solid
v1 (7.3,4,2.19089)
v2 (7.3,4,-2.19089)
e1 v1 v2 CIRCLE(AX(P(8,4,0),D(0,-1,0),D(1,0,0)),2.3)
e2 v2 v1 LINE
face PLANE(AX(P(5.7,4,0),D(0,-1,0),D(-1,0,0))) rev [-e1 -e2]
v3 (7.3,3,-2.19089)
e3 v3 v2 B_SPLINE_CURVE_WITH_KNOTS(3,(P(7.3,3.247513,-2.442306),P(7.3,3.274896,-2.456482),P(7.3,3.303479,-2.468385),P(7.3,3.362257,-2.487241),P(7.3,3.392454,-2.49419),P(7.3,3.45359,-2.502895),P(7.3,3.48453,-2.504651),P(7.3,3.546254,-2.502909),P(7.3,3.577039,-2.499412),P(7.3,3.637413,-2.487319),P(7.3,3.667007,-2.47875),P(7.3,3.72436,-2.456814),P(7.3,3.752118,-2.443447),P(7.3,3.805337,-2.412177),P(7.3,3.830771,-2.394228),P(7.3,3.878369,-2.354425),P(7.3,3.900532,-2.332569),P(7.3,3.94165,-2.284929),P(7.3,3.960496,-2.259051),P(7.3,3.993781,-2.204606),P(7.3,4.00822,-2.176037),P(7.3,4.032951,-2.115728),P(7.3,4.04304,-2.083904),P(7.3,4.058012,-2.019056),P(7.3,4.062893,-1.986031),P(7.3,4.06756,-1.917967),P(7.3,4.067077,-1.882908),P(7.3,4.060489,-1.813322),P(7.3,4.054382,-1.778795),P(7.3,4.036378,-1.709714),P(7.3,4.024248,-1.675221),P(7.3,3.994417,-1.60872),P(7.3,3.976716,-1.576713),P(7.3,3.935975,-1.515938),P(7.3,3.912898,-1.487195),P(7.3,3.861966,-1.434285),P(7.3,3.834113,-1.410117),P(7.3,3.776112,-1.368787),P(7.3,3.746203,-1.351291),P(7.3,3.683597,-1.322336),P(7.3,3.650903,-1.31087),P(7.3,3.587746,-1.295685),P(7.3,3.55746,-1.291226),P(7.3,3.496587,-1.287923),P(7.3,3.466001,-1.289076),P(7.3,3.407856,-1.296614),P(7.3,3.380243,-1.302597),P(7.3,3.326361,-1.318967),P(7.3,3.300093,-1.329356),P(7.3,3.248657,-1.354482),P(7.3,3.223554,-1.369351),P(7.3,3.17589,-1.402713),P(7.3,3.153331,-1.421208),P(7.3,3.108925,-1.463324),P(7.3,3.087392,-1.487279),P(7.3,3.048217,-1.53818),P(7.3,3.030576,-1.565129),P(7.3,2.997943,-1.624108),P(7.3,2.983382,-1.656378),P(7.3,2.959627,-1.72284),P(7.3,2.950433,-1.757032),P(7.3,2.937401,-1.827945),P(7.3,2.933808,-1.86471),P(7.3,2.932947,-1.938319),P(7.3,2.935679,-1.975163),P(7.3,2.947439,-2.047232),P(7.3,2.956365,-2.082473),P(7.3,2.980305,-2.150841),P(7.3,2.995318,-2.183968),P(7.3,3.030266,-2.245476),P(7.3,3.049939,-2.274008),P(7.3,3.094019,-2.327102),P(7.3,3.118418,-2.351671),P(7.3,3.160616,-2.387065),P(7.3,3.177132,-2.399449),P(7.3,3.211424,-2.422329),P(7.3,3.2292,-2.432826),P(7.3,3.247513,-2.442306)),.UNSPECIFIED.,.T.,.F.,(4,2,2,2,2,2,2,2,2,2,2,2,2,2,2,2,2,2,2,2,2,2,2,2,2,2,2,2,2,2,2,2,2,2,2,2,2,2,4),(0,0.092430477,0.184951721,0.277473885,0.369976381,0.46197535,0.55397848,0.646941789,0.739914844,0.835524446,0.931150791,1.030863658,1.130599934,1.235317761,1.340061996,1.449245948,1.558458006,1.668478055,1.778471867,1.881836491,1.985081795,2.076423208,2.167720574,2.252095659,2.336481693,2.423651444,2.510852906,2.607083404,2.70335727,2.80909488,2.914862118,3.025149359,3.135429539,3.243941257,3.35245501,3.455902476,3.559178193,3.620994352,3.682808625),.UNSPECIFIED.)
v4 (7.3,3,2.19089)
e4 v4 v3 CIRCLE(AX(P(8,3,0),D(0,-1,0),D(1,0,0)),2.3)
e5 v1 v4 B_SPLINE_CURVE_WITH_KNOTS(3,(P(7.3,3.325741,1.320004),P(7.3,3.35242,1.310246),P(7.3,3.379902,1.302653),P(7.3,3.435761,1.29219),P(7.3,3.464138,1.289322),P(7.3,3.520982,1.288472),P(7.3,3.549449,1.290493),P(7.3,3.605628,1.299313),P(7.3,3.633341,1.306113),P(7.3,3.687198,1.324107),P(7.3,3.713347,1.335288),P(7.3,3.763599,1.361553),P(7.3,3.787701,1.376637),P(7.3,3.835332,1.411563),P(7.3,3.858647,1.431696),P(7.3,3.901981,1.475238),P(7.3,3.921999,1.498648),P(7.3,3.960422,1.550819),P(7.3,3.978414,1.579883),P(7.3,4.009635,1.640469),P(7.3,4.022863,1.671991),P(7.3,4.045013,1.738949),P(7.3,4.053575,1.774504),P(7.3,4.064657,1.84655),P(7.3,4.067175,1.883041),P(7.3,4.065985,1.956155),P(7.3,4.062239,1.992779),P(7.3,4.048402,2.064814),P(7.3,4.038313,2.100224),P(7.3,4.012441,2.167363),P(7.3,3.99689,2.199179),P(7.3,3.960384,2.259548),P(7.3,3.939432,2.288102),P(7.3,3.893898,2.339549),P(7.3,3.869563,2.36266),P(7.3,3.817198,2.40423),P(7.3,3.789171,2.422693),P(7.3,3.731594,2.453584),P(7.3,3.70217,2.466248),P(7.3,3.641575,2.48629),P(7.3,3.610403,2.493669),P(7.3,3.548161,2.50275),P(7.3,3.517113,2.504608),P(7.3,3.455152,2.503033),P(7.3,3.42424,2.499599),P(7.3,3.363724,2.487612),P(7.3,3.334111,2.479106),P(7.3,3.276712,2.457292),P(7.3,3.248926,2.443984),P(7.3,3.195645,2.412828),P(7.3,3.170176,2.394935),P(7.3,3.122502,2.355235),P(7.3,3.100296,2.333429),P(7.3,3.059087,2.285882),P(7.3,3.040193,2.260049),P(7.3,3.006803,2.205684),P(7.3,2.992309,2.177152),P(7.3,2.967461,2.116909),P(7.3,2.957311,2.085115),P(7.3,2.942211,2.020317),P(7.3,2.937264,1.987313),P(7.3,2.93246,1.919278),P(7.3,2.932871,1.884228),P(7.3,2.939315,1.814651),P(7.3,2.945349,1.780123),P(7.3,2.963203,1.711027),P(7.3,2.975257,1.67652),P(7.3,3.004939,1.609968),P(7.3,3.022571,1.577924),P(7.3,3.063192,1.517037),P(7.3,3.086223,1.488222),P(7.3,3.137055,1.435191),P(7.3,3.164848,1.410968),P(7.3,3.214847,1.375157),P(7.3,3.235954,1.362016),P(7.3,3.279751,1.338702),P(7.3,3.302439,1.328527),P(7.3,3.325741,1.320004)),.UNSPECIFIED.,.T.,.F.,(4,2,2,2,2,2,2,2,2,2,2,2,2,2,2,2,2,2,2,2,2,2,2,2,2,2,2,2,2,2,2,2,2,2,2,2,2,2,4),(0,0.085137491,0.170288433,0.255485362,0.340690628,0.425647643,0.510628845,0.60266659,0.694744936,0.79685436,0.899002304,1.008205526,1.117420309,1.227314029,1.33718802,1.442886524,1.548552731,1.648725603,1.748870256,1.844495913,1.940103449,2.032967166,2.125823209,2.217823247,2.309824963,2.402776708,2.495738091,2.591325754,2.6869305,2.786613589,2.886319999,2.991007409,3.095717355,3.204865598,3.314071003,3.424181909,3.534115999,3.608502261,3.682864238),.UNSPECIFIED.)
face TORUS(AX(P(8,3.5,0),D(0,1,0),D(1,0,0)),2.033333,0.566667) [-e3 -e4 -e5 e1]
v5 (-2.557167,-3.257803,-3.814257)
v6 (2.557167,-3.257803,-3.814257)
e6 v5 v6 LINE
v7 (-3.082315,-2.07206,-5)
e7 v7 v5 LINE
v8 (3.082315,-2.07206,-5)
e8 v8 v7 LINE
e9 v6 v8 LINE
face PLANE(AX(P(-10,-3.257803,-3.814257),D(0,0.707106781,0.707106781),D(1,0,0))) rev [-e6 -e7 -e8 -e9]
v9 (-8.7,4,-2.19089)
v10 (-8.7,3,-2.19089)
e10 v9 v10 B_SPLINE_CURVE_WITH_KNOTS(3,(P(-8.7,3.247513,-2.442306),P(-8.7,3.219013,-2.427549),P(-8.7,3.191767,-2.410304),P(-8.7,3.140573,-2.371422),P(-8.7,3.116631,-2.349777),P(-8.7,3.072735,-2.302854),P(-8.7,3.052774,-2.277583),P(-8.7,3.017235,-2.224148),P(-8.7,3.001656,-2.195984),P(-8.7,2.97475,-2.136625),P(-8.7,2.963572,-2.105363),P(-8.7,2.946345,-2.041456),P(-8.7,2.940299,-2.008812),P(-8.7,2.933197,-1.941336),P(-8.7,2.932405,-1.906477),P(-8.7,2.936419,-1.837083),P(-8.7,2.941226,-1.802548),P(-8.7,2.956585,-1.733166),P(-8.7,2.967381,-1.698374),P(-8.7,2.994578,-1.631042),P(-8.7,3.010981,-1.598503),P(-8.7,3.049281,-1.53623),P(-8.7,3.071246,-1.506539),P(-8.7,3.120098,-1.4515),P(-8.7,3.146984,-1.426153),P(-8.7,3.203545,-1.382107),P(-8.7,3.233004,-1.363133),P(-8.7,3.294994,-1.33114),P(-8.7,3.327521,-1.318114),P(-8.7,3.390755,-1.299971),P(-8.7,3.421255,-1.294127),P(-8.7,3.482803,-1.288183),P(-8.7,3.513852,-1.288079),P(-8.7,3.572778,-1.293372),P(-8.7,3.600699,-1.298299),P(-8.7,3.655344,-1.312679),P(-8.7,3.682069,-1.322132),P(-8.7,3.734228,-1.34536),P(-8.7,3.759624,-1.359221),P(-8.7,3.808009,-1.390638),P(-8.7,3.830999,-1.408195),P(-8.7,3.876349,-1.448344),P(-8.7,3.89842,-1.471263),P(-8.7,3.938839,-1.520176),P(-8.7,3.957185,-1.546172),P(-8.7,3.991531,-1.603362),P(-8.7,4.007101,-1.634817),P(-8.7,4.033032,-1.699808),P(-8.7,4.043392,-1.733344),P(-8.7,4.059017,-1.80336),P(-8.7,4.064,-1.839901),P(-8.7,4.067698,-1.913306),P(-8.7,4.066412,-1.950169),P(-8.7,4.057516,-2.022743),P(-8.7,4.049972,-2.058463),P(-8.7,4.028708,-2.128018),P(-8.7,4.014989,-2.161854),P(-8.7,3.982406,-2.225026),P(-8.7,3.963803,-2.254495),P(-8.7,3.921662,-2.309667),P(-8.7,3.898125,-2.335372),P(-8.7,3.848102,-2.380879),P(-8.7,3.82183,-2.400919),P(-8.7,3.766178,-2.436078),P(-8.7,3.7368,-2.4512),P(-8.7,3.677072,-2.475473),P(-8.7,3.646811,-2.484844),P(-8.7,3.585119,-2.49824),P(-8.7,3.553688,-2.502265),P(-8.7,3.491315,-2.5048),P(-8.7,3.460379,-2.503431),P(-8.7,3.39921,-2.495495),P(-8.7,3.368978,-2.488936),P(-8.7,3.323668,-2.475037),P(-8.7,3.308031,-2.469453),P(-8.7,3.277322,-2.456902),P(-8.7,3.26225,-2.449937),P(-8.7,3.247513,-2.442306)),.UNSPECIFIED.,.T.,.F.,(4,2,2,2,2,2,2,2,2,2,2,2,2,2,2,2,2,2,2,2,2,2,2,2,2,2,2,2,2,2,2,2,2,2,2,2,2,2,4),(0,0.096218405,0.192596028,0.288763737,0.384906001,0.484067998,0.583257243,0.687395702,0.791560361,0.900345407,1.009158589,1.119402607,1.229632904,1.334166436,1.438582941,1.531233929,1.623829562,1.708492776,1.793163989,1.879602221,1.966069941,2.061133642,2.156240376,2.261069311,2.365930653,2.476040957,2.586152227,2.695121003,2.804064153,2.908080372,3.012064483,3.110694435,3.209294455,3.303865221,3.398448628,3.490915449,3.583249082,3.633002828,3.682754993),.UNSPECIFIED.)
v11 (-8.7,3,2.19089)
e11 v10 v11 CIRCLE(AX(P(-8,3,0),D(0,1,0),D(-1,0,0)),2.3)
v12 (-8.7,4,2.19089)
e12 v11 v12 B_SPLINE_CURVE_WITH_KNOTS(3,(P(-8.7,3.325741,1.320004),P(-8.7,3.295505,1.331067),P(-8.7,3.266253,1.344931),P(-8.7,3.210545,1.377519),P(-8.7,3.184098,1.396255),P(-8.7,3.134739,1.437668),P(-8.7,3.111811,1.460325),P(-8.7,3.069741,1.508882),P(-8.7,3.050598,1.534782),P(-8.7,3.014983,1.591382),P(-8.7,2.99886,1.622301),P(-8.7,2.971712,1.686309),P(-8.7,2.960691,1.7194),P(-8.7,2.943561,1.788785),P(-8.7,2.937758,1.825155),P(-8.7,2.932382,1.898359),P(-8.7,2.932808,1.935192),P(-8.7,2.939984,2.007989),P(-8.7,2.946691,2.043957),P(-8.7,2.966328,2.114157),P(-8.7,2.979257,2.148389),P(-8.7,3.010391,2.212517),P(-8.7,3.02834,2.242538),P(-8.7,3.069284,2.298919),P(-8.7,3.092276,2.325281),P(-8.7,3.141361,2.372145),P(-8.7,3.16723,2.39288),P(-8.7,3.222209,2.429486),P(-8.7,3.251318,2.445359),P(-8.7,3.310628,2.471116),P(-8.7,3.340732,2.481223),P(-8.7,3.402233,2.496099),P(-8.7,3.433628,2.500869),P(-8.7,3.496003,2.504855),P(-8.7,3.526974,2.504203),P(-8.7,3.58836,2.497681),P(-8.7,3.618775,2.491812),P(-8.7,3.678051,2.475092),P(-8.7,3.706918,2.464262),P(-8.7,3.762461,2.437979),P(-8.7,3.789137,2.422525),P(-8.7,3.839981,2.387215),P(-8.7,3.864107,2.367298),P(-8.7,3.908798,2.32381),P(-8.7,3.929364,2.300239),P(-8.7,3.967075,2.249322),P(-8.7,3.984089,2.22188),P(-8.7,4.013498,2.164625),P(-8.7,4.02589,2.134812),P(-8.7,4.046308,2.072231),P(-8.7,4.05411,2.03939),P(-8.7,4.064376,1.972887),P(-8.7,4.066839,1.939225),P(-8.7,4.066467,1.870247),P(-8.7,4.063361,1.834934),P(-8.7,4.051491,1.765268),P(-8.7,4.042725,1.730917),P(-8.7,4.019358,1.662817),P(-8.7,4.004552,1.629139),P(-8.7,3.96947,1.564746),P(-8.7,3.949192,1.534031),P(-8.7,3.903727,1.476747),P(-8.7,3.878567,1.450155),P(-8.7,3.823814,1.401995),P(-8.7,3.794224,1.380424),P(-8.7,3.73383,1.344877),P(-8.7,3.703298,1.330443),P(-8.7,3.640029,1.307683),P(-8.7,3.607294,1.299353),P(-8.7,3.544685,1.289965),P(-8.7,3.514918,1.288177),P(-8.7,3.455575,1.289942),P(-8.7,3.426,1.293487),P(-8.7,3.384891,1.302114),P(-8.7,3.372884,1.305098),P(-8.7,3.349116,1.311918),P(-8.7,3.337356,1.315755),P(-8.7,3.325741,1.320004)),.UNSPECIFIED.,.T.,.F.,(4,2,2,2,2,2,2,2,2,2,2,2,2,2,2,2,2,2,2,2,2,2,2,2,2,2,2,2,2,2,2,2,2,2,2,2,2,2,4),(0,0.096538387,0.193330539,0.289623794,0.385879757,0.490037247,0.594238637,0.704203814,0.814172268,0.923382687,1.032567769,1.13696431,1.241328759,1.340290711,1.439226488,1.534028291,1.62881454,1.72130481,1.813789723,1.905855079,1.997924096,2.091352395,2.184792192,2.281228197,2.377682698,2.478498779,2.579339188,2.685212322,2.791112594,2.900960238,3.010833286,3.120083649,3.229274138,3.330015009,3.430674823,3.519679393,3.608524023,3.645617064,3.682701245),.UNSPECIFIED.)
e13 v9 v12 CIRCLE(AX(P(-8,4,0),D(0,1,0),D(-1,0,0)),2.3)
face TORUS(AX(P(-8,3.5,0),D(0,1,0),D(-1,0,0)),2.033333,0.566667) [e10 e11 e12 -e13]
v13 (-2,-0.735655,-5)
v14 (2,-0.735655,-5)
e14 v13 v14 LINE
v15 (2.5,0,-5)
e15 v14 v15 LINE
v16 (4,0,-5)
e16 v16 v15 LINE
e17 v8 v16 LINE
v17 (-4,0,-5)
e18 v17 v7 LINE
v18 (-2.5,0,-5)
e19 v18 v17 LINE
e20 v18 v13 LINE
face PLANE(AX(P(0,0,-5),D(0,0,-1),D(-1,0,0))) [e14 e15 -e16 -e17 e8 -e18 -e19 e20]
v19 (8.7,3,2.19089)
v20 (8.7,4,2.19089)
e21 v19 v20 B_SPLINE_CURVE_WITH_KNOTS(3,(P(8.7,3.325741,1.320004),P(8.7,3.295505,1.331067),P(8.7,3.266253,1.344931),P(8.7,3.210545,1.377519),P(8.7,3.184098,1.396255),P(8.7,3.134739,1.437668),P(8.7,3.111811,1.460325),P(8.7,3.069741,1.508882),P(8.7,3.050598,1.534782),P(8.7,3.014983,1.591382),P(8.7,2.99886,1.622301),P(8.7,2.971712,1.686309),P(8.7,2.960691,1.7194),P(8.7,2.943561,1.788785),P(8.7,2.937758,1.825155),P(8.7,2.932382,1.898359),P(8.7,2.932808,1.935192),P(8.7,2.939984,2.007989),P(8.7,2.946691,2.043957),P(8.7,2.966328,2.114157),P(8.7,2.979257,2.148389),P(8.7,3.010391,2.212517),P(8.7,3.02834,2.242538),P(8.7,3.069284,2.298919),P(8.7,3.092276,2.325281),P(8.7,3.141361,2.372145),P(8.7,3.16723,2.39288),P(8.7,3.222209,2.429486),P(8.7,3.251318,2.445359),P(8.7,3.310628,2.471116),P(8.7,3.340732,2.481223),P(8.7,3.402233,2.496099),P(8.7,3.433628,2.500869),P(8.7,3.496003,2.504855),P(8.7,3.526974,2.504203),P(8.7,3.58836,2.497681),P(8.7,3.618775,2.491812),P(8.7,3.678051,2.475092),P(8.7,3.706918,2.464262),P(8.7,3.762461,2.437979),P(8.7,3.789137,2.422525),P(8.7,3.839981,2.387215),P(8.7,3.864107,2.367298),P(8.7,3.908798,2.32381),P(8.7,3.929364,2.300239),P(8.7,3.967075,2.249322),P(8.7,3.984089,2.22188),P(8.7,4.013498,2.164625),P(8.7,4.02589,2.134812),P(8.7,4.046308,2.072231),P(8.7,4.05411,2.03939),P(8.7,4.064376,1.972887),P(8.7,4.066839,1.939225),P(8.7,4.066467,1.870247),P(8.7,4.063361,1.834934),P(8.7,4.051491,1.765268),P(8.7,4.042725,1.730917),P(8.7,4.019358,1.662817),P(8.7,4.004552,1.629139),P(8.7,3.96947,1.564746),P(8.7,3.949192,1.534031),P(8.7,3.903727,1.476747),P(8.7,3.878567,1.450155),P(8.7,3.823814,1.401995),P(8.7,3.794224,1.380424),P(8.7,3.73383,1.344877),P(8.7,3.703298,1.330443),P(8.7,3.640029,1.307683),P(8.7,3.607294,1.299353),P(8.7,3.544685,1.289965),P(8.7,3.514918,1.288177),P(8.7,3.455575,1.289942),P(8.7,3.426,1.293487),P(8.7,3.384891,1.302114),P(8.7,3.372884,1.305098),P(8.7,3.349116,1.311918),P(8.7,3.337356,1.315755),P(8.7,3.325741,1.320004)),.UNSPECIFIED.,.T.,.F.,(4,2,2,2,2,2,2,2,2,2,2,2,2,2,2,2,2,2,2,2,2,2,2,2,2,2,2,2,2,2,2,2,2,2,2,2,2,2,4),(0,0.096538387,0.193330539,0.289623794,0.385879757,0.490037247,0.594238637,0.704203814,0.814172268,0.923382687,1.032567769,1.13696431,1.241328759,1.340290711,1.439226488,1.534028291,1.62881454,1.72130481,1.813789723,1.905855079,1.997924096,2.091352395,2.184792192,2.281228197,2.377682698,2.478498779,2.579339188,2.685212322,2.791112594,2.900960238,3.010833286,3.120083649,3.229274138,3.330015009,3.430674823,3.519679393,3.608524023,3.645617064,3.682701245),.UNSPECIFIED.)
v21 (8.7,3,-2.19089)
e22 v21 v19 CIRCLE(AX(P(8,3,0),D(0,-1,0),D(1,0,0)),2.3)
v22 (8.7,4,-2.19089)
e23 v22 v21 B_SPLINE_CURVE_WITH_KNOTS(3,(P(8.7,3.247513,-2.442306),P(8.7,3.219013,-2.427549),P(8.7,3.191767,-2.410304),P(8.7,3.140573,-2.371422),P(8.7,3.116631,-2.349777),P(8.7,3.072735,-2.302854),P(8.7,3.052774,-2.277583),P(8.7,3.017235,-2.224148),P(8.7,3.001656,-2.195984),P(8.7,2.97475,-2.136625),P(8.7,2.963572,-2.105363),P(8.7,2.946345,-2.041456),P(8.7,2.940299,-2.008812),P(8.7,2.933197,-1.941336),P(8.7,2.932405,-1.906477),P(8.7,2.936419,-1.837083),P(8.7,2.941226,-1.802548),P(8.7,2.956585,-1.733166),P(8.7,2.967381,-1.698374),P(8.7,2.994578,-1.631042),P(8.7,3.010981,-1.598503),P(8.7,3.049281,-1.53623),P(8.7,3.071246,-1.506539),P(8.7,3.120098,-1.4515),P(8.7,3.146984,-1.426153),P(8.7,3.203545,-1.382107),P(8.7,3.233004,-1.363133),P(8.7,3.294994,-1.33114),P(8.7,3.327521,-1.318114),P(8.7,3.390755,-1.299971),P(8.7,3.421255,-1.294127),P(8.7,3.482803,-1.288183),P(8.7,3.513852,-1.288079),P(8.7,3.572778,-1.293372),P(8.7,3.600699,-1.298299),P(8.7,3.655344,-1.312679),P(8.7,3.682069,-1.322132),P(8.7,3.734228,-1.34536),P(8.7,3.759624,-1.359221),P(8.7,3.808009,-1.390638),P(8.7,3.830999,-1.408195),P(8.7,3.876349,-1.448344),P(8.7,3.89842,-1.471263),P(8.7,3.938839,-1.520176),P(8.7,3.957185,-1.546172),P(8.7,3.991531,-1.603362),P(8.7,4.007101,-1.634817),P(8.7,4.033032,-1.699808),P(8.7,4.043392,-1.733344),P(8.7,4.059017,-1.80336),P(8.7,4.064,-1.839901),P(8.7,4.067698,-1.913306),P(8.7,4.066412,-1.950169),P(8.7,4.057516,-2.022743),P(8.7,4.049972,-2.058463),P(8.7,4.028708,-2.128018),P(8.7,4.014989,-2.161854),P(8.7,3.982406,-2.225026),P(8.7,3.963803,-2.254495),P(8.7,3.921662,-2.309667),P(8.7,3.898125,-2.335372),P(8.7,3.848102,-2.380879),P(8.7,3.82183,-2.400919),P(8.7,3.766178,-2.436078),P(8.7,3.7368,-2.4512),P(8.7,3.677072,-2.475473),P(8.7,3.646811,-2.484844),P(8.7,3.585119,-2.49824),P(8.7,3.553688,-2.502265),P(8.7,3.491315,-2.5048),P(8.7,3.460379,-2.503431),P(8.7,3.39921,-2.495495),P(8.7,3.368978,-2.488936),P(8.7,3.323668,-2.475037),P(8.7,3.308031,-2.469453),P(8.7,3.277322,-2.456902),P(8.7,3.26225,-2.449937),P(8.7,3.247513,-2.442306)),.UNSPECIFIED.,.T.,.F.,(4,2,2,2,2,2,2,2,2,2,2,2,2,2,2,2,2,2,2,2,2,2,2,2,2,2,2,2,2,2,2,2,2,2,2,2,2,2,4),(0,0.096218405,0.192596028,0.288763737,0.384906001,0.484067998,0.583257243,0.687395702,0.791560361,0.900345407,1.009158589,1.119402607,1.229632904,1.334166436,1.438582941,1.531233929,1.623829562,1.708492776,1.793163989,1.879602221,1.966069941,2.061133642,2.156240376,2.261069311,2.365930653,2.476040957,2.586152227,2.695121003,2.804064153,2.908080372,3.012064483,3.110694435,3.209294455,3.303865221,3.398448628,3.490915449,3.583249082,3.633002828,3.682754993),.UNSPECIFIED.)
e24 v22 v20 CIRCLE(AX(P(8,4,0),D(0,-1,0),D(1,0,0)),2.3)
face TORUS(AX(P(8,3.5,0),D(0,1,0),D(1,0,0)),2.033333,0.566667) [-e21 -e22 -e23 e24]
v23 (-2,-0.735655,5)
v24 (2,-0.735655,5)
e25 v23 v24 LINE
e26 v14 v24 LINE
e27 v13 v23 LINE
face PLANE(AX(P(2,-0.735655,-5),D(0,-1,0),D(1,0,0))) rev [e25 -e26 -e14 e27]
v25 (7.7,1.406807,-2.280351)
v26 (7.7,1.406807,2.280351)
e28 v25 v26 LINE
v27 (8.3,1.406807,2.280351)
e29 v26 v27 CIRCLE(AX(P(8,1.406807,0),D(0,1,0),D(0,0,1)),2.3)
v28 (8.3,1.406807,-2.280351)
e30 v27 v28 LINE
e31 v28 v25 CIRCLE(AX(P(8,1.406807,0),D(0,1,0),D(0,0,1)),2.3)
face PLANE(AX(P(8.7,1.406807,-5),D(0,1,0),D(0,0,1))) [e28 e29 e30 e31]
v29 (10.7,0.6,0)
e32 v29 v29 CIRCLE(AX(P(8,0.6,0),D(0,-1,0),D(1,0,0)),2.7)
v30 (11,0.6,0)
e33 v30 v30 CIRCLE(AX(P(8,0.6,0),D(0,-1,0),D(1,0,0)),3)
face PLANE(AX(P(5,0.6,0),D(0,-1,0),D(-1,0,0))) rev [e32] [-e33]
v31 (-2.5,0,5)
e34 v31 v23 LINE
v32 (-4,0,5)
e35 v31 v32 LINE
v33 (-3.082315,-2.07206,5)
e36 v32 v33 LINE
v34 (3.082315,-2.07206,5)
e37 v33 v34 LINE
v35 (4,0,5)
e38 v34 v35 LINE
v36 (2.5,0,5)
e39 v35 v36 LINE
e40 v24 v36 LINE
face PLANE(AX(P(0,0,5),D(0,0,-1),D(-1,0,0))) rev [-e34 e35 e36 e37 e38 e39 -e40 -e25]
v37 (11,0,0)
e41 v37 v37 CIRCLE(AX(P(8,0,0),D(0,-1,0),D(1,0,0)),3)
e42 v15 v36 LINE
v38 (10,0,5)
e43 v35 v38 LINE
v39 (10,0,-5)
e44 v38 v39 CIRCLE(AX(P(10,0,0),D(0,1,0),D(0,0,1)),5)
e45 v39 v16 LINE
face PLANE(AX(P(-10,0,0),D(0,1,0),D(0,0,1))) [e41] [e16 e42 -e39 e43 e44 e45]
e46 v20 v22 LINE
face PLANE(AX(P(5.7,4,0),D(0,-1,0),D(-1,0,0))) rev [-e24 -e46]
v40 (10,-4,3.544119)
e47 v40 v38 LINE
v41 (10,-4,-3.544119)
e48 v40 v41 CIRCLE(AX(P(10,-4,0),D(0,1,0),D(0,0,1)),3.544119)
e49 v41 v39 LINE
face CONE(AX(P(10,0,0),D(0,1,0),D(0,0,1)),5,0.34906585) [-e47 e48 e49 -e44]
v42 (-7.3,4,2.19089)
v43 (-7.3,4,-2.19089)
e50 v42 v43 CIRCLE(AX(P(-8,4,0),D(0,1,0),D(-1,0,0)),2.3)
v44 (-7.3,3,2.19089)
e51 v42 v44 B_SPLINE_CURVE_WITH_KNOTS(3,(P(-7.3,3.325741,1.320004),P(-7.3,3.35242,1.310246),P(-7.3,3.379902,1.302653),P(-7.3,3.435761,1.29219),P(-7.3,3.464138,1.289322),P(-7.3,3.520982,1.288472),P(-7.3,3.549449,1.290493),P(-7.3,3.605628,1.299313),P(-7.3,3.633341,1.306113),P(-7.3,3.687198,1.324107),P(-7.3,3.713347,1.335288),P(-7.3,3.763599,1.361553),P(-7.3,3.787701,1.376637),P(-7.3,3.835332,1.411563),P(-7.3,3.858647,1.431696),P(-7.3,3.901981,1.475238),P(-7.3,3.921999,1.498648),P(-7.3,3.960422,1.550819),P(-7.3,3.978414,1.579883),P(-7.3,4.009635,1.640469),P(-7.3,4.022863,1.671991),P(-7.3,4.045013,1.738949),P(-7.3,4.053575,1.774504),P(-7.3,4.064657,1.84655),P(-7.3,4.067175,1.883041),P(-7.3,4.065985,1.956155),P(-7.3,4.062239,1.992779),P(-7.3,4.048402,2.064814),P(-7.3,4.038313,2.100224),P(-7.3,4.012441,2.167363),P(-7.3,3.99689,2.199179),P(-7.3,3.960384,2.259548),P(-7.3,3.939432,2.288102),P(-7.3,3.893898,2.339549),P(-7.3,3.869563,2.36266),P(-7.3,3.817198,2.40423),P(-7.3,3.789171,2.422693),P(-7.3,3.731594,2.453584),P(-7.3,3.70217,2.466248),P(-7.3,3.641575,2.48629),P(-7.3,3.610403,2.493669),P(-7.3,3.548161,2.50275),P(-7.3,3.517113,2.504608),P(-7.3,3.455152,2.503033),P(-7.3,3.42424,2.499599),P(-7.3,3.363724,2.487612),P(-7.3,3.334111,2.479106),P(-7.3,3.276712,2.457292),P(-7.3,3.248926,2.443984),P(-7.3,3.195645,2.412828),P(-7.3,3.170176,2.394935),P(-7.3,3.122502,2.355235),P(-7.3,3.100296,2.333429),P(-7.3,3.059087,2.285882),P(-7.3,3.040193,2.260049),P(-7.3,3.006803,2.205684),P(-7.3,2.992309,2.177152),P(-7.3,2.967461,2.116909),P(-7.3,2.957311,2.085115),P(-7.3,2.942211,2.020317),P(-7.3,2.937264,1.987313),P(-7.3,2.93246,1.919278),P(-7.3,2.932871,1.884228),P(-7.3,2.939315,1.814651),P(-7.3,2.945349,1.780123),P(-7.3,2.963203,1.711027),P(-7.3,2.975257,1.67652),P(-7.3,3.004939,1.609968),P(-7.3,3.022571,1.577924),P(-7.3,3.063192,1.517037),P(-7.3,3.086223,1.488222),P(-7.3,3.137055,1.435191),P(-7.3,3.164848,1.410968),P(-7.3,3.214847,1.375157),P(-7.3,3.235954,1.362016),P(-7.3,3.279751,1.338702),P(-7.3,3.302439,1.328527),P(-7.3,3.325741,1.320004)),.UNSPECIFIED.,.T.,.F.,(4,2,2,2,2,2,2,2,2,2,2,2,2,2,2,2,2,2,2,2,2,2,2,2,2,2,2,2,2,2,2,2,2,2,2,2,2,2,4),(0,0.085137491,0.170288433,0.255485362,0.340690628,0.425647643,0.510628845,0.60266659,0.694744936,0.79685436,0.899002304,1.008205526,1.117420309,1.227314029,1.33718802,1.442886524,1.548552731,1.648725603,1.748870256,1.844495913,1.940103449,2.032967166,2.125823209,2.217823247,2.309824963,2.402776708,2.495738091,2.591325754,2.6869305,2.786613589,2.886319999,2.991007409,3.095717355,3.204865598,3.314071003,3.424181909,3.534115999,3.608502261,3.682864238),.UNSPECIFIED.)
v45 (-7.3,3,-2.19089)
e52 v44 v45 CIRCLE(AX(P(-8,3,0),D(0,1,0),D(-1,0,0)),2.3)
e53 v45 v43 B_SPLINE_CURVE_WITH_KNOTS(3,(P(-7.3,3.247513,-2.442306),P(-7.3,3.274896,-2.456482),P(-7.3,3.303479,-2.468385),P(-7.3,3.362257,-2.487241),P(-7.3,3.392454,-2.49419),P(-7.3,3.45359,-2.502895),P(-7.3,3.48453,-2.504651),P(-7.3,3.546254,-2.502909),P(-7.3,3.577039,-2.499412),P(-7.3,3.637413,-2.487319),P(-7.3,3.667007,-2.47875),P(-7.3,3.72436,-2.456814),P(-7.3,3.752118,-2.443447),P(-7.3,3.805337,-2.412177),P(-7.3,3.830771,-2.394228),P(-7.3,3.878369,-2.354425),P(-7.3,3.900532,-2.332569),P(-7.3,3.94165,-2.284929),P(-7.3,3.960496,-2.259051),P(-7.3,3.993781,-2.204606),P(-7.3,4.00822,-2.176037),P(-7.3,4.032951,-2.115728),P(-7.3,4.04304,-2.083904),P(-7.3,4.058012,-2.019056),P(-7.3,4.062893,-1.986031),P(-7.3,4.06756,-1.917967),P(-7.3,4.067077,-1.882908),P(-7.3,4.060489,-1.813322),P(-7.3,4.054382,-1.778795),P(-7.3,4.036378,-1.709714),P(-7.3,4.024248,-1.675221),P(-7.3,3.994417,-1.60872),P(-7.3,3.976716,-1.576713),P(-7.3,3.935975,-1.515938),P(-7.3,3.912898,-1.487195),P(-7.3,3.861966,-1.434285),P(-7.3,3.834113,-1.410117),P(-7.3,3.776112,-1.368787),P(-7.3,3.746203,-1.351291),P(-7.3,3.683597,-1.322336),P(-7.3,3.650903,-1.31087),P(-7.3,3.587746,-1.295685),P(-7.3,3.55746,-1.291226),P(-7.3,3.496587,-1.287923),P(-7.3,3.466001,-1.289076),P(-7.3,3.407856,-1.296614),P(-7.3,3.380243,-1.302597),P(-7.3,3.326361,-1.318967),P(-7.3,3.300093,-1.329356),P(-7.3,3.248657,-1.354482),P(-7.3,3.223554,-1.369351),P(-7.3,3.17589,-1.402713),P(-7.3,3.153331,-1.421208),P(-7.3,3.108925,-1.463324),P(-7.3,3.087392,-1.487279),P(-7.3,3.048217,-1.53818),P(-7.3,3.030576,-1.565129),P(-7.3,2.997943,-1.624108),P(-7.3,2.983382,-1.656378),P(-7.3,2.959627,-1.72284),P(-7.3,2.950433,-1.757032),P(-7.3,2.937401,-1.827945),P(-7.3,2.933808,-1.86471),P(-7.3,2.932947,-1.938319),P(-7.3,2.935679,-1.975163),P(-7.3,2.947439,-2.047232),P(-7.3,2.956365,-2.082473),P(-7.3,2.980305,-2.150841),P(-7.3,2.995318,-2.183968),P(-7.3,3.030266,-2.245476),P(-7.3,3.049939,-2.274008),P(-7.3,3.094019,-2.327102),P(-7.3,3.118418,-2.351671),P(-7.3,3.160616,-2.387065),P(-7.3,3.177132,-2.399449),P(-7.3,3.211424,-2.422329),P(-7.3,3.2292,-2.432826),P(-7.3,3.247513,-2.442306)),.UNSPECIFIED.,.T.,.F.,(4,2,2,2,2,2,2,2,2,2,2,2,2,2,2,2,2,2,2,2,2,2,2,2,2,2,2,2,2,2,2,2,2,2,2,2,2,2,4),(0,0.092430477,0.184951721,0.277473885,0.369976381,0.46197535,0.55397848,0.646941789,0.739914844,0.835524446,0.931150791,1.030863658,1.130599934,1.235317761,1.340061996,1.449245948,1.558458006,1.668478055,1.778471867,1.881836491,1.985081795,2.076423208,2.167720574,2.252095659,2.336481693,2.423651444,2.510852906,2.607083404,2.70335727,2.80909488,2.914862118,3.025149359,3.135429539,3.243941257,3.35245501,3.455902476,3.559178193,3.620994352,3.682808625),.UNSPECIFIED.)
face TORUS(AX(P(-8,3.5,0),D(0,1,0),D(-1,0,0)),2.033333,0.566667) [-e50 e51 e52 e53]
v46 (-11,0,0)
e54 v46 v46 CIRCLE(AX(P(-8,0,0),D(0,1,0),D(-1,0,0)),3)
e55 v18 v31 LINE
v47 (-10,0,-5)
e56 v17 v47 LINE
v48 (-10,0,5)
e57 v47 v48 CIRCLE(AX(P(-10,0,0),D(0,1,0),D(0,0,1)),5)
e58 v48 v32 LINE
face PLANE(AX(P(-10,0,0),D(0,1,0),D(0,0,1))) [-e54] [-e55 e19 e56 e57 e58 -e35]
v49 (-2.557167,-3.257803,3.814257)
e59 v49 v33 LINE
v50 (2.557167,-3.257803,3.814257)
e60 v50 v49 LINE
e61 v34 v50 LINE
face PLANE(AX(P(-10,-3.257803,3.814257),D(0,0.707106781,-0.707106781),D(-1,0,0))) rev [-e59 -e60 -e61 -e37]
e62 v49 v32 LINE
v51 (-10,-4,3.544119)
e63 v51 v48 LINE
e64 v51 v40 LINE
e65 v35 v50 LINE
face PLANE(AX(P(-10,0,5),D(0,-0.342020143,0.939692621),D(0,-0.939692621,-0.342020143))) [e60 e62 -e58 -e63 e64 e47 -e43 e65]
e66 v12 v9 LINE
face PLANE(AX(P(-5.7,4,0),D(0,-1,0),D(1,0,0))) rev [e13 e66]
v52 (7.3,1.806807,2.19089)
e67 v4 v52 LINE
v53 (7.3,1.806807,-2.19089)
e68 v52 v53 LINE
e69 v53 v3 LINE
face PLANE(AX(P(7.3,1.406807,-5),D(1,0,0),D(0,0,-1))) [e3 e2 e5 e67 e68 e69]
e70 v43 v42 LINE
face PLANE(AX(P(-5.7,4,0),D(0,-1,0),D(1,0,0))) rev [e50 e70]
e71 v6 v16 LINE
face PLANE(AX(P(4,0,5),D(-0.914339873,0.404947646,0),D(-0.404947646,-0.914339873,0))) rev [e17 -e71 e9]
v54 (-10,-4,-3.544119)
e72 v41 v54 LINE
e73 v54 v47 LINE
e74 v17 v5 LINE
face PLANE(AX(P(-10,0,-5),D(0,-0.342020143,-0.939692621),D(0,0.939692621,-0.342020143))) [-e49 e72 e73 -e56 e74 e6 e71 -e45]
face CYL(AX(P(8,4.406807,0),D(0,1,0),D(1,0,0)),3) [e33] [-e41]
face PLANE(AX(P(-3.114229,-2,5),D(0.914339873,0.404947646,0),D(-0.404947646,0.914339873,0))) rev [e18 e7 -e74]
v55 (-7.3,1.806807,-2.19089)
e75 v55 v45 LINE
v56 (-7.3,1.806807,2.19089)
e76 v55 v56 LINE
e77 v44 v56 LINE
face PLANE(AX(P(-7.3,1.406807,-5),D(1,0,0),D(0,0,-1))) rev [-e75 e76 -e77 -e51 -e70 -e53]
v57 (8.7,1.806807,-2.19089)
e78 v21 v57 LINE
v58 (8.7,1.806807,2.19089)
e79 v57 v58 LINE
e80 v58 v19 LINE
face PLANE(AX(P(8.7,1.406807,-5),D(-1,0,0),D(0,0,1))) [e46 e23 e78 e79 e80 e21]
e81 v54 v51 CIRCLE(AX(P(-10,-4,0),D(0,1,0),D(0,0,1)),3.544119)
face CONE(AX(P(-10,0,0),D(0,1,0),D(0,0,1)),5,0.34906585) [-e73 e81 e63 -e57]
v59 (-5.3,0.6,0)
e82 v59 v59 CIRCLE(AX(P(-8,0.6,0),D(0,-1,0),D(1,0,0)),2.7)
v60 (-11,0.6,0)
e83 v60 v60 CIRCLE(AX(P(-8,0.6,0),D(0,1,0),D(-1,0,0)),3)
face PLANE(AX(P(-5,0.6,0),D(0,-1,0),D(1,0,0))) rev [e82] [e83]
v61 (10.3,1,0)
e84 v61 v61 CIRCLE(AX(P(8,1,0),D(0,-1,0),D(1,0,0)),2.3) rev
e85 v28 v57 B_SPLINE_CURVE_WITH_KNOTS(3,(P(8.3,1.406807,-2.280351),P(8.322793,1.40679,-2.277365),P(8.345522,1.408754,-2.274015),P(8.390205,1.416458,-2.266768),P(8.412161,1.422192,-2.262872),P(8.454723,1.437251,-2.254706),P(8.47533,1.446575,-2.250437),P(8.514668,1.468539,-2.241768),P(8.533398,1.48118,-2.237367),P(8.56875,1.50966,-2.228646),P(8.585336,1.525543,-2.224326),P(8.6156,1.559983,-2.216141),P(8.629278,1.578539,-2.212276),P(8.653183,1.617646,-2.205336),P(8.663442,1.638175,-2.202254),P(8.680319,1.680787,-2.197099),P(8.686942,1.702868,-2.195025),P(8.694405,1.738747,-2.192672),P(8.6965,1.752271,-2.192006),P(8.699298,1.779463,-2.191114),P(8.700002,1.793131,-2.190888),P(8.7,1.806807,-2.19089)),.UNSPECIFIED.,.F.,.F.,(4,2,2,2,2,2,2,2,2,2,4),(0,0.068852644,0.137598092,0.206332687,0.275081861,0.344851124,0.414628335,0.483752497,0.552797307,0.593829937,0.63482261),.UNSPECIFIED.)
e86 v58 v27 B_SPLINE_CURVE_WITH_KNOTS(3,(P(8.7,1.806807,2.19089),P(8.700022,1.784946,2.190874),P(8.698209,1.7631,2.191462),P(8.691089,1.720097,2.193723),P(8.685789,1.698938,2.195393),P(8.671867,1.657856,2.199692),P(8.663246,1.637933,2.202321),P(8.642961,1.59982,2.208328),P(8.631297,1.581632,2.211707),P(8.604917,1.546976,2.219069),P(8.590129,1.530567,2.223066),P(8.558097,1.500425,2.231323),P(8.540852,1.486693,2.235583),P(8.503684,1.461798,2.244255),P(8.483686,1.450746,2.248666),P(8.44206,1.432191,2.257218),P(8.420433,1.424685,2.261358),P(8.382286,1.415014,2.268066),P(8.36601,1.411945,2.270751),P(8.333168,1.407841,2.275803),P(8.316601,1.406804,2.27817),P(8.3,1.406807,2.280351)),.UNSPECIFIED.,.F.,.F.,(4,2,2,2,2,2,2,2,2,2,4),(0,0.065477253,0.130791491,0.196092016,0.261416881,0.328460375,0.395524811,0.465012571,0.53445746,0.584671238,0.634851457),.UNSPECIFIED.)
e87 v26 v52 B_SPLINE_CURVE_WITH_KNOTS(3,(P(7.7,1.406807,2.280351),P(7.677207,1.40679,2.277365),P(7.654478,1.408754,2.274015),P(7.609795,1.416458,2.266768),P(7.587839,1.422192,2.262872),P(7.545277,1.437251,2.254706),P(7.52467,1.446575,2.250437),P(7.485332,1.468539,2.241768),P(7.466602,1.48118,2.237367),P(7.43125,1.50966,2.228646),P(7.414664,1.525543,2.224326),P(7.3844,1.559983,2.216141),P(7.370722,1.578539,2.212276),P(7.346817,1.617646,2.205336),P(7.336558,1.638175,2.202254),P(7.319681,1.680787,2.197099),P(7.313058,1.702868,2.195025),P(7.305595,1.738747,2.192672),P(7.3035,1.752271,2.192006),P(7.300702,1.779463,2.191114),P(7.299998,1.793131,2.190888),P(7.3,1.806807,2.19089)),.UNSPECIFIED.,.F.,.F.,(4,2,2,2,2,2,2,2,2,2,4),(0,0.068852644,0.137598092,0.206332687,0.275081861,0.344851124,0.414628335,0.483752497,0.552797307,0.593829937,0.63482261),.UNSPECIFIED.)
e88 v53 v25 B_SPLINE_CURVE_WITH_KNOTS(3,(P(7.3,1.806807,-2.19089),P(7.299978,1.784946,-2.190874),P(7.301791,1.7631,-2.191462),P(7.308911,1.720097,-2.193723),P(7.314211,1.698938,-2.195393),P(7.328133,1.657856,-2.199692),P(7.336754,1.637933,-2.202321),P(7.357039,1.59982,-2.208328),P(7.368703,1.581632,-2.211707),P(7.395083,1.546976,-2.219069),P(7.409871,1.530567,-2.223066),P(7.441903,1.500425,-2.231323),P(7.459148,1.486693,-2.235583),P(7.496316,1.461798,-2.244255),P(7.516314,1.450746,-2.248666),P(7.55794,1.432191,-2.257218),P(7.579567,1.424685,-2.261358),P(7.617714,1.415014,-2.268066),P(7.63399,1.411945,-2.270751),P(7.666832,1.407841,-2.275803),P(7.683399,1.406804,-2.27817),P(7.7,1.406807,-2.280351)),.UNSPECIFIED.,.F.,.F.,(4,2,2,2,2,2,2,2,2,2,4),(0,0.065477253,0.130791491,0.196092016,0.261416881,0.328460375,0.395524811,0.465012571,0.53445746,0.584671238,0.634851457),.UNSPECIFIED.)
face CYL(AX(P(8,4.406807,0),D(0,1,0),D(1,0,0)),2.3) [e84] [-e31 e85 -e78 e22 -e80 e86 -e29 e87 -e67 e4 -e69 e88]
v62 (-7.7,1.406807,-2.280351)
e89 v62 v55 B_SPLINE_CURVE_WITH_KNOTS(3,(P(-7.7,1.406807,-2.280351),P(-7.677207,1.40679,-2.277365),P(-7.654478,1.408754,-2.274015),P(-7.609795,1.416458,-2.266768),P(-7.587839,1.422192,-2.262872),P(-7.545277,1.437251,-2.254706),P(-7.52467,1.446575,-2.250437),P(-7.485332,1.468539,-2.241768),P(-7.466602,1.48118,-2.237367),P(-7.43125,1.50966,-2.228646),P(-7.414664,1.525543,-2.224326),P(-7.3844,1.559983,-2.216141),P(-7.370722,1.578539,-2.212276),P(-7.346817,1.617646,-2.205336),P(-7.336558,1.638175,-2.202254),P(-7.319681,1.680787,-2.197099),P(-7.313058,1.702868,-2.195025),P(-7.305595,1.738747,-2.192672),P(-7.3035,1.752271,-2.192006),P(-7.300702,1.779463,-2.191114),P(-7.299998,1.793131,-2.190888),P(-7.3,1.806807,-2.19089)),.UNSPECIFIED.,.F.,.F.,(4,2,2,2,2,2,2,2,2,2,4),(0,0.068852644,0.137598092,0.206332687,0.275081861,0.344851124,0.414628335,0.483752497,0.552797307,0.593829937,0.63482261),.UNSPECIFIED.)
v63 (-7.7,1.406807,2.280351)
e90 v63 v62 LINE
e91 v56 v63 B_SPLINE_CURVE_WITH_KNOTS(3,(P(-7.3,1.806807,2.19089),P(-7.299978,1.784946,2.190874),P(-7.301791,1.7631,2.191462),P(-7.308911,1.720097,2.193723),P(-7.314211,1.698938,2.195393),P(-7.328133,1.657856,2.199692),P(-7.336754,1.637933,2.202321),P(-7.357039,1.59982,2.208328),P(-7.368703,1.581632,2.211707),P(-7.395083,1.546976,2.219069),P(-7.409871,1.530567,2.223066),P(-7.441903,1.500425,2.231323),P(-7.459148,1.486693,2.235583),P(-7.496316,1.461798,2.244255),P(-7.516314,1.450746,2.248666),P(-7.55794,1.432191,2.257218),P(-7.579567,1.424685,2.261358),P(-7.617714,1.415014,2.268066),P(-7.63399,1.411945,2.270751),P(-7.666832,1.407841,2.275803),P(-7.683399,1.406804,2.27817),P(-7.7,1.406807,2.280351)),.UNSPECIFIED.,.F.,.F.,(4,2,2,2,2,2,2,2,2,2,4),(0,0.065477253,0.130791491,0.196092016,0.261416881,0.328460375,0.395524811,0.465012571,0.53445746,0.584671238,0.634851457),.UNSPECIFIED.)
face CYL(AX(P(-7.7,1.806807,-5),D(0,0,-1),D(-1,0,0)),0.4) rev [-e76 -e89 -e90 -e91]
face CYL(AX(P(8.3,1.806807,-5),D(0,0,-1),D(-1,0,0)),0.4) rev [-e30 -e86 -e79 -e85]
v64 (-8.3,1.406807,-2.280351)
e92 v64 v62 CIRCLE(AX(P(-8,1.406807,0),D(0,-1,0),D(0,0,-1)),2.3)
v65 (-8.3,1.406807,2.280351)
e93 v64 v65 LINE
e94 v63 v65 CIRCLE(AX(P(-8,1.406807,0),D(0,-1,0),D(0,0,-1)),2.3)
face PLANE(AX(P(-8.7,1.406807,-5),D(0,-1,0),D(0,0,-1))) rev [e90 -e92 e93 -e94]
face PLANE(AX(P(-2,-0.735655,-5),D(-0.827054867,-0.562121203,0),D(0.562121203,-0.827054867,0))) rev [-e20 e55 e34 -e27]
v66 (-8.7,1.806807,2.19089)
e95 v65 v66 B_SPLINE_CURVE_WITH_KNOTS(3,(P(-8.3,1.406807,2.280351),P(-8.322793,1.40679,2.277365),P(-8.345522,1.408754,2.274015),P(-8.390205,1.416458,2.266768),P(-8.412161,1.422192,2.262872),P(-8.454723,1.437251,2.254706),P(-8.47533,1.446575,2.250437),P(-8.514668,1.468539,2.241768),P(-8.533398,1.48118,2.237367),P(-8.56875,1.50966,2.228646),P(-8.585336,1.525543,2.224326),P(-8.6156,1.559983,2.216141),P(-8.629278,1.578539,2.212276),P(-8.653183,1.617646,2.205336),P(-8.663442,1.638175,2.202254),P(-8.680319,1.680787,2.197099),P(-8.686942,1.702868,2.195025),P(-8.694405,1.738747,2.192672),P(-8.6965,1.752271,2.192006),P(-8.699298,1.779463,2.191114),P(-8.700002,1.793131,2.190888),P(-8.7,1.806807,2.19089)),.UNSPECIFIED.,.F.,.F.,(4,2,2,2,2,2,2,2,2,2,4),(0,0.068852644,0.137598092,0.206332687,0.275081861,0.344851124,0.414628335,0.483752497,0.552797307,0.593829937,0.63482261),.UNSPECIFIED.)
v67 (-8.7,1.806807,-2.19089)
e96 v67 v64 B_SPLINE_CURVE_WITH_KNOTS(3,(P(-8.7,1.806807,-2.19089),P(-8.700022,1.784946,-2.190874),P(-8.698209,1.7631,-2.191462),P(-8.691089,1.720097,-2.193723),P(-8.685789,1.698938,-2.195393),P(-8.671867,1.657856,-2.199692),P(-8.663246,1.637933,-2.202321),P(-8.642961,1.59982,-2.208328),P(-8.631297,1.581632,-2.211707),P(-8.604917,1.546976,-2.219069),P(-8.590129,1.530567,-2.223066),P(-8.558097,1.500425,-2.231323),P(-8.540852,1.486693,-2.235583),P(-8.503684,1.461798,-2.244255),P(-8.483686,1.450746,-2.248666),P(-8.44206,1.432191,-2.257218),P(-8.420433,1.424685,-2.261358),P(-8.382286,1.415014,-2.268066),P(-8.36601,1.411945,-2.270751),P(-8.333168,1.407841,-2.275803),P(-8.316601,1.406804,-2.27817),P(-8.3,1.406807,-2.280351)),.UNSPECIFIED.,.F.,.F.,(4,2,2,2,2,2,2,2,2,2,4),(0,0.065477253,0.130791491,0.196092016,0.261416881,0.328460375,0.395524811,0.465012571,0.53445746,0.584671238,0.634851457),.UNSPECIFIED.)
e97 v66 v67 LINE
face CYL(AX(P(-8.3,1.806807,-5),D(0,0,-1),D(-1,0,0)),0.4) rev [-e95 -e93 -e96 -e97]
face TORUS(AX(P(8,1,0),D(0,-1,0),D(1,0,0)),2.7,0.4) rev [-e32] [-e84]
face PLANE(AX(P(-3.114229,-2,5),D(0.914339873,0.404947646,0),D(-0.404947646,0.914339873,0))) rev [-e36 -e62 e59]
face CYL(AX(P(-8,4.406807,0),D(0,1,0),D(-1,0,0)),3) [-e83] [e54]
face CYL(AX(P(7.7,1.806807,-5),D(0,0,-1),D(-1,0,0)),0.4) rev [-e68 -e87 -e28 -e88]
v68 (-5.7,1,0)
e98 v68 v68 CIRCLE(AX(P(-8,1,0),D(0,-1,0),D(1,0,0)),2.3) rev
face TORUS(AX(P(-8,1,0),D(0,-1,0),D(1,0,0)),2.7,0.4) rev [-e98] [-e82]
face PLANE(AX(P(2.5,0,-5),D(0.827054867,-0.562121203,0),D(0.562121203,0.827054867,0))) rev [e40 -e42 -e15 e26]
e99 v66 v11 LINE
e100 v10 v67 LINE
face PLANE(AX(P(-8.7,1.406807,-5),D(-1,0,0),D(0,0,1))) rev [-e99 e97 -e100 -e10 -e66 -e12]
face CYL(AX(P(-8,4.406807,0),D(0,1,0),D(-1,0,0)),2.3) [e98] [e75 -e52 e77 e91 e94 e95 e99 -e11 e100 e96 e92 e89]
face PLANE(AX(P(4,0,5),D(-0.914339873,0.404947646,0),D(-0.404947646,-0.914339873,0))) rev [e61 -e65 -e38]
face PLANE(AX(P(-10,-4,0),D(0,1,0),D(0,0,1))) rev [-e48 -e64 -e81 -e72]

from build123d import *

# Parameters (mm, degrees)
BOSS_EXTRUDE1_DEPTH     = 4
BOSS_EXTRUDE1_DRAFT     = -20
SKETCH3_W               = 1.4
SKETCH3_H               = 6
CUT_EXTRUDE1_DEPTH      = 17.309506455
FILLET1_R               = 0.4
FILLET1_OF_MIRROR1_R    = 0.4
BOSS_EXTRUDE2_DEPTH     = 5
CHAMFER1_SIZE           = 1.338525748
CHAMFER1_SIZE_2         = 0.8
CUT_EXTRUDE2_DEPTH      = 17.309506455
CUT_EXTRUDE2_DEPTH_BACK = 17.309506455


with BuildPart() as part:
    # Sketch1 → Boss-Extrude1 (with draft: the straight prism first)
    with BuildSketch(Plane(origin=(0, 0, 0), x_dir=(1, 0, 0), z_dir=(0, 1, 0))):
        with BuildLine():
            ThreePointArc((-10, 5), (-15, 0), (-10, -5))
            Line((-10, -5), (10, -5))
            ThreePointArc((10, -5), (15, 0), (10, 5))
            Line((10, 5), (-10, 5))
        make_face()
    extrude(amount=-BOSS_EXTRUDE1_DEPTH)
    # Boss-Extrude1: the draft: its side faces are tilted about the plane it starts from
    boss_extrude1_sides = [part.faces().sort_by_distance(p)[0] for p in [
        (-15, -2, 0),
        (0, -2, 5),
        (15, -2, 0),
        (0, -2, -5),
    ]]
    draft(boss_extrude1_sides, Plane(origin=(0, 0, 0), x_dir=(1, 0, 0), z_dir=(0, 1, 0)), BOSS_EXTRUDE1_DRAFT)

    # Sketch2 → Revolve1 (revolve)
    with BuildSketch(Plane.XY, mode=Mode.PRIVATE) as revolve1_sk:
        with BuildLine():
            Line((-5, 0), (-8, 0))
            Line((-8, 0), (-8, 4))
            Line((-8, 4), (-5.7, 4))
            ThreePointArc((-5.7, 4), (-5.4, 3.5), (-5.7, 3))
            Line((-5.7, 3), (-5.7, 0.6))
            Line((-5.7, 0.6), (-5, 0.6))
            Line((-5, 0.6), (-5, 0))
        make_face()
    revolve1 = revolve(revolve1_sk.sketch.rotate(Axis((-8, 4.406807082, 0), (0, -1, 0)), 180), axis=Axis((-8, 4.406807082, 0), (0, -1, 0)))

    # Sketch3 → Cut-Extrude1 (cut, symmetric)
    with BuildSketch(Plane.XY):
        with Locations((-8, 4.406807082)):
            Rectangle(SKETCH3_W, SKETCH3_H)
    cut_extrude1 = extrude(amount=CUT_EXTRUDE1_DEPTH, both=True, mode=Mode.SUBTRACT)

    # Fillet1
    fillet1_edges = [part.edges().sort_by_distance(p)[0] for p in [
        (-5.7, 0.6, 0),
        (-7.3, 1.406807082, 0),
        (-8.7, 1.406807082, 0),
    ]]
    fillet(fillet1_edges, radius=FILLET1_R)

    # Mirror1: Revolve1, Cut-Extrude1 across plane
    add(revolve1.mirror(Plane(origin=(0, 0, 0), x_dir=(0, 0, 1), z_dir=(1, 0, 0))))
    add(cut_extrude1.mirror(Plane(origin=(0, 0, 0), x_dir=(0, 0, 1), z_dir=(1, 0, 0))), mode=Mode.SUBTRACT)

    # Fillet1 of Mirror1
    fillet1_of_mirror1_edges = [part.edges().sort_by_distance(p)[0] for p in [
        (5.7, 0.6, 0),
        (7.3, 1.406807082, 0),
        (8.7, 1.406807082, 0),
    ]]
    fillet(fillet1_of_mirror1_edges, radius=FILLET1_OF_MIRROR1_R)

    # Sketch4 → Boss-Extrude2 (add, symmetric)
    with BuildSketch(Plane.XY):
        Polygon((-4, 0), (4, 0), (3.114229495, -2), (-3.114229495, -2), align=None)
    extrude(amount=BOSS_EXTRUDE2_DEPTH, both=True)

    # Chamfer1
    # the kernel refuses this chamfer: 1.338525748, 0.8 mm, written as the material it adds along each edge
    with BuildSketch(Plane(origin=(6.582316876, -2, 4.272059531), x_dir=(0, -0.9339888612507298, -0.3573021229429867), z_dir=(-1, 0, 0))) as chamfer1_piece_1_section:
        Polygon((CHAMFER1_SIZE * 0.999866964174, CHAMFER1_SIZE * 0.0163111641321), (-CHAMFER1_SIZE_2 * 0.357302122943, CHAMFER1_SIZE_2 * 0.933988861251), (0, 0), align=None)
    chamfer1_piece_1 = extrude(amount=13.164633752, mode=Mode.PRIVATE)
    chamfer1_piece_1 = split(chamfer1_piece_1, bisect_by=Plane(origin=(-2.45134628, -3.496738063, 4.375919387), z_dir=(0.9143398734593109, 0.40494764575486975, 0)), keep=Keep.TOP, mode=Mode.PRIVATE)
    chamfer1_piece_1 = split(chamfer1_piece_1, bisect_by=Plane(origin=(2.45134628, -3.496738063, 4.375919387), z_dir=(-0.914339873459311, 0.40494764575486936, 0)), keep=Keep.TOP, mode=Mode.PRIVATE)
    chamfer1_piece_1 = split(chamfer1_piece_1, bisect_by=Plane(origin=(0, -2.411072946, 5), z_dir=(0, 0, -1)), keep=Keep.TOP, mode=Mode.PRIVATE)
    add(chamfer1_piece_1)
    with BuildSketch(Plane(origin=(-6.582316876, -2, -4.272059531), x_dir=(0, -0.9339888612507298, 0.3573021229429865), z_dir=(1, 0, 0))) as chamfer1_piece_2_section:
        Polygon((CHAMFER1_SIZE * 0.999866964174, CHAMFER1_SIZE * 0.0163111641321), (-CHAMFER1_SIZE_2 * 0.357302122943, CHAMFER1_SIZE_2 * 0.933988861251), (0, 0), align=None)
    chamfer1_piece_2 = extrude(amount=13.164633752, mode=Mode.PRIVATE)
    chamfer1_piece_2 = split(chamfer1_piece_2, bisect_by=Plane(origin=(2.45134628, -3.496738063, -4.375919387), z_dir=(-0.914339873459311, 0.40494764575486936, 0)), keep=Keep.TOP, mode=Mode.PRIVATE)
    chamfer1_piece_2 = split(chamfer1_piece_2, bisect_by=Plane(origin=(-2.45134628, -3.496738063, -4.375919387), z_dir=(0.9143398734593109, 0.40494764575486975, 0)), keep=Keep.TOP, mode=Mode.PRIVATE)
    chamfer1_piece_2 = split(chamfer1_piece_2, bisect_by=Plane(origin=(0, -2.411072946, -5), z_dir=(0, 0, 1)), keep=Keep.TOP, mode=Mode.PRIVATE)
    add(chamfer1_piece_2)

    # Sketch5 → Cut-Extrude2 (cut, two sides: drawn at the far end of the back side and taken through both)
    with BuildSketch(Plane.XY.offset(-CUT_EXTRUDE2_DEPTH_BACK)):
        Polygon((-2.5, 0), (2.5, 0), (2, -0.735655285), (-2, -0.735655285), align=None)
    extrude(amount=CUT_EXTRUDE2_DEPTH + CUT_EXTRUDE2_DEPTH_BACK, mode=Mode.SUBTRACT)


solid = part.part
